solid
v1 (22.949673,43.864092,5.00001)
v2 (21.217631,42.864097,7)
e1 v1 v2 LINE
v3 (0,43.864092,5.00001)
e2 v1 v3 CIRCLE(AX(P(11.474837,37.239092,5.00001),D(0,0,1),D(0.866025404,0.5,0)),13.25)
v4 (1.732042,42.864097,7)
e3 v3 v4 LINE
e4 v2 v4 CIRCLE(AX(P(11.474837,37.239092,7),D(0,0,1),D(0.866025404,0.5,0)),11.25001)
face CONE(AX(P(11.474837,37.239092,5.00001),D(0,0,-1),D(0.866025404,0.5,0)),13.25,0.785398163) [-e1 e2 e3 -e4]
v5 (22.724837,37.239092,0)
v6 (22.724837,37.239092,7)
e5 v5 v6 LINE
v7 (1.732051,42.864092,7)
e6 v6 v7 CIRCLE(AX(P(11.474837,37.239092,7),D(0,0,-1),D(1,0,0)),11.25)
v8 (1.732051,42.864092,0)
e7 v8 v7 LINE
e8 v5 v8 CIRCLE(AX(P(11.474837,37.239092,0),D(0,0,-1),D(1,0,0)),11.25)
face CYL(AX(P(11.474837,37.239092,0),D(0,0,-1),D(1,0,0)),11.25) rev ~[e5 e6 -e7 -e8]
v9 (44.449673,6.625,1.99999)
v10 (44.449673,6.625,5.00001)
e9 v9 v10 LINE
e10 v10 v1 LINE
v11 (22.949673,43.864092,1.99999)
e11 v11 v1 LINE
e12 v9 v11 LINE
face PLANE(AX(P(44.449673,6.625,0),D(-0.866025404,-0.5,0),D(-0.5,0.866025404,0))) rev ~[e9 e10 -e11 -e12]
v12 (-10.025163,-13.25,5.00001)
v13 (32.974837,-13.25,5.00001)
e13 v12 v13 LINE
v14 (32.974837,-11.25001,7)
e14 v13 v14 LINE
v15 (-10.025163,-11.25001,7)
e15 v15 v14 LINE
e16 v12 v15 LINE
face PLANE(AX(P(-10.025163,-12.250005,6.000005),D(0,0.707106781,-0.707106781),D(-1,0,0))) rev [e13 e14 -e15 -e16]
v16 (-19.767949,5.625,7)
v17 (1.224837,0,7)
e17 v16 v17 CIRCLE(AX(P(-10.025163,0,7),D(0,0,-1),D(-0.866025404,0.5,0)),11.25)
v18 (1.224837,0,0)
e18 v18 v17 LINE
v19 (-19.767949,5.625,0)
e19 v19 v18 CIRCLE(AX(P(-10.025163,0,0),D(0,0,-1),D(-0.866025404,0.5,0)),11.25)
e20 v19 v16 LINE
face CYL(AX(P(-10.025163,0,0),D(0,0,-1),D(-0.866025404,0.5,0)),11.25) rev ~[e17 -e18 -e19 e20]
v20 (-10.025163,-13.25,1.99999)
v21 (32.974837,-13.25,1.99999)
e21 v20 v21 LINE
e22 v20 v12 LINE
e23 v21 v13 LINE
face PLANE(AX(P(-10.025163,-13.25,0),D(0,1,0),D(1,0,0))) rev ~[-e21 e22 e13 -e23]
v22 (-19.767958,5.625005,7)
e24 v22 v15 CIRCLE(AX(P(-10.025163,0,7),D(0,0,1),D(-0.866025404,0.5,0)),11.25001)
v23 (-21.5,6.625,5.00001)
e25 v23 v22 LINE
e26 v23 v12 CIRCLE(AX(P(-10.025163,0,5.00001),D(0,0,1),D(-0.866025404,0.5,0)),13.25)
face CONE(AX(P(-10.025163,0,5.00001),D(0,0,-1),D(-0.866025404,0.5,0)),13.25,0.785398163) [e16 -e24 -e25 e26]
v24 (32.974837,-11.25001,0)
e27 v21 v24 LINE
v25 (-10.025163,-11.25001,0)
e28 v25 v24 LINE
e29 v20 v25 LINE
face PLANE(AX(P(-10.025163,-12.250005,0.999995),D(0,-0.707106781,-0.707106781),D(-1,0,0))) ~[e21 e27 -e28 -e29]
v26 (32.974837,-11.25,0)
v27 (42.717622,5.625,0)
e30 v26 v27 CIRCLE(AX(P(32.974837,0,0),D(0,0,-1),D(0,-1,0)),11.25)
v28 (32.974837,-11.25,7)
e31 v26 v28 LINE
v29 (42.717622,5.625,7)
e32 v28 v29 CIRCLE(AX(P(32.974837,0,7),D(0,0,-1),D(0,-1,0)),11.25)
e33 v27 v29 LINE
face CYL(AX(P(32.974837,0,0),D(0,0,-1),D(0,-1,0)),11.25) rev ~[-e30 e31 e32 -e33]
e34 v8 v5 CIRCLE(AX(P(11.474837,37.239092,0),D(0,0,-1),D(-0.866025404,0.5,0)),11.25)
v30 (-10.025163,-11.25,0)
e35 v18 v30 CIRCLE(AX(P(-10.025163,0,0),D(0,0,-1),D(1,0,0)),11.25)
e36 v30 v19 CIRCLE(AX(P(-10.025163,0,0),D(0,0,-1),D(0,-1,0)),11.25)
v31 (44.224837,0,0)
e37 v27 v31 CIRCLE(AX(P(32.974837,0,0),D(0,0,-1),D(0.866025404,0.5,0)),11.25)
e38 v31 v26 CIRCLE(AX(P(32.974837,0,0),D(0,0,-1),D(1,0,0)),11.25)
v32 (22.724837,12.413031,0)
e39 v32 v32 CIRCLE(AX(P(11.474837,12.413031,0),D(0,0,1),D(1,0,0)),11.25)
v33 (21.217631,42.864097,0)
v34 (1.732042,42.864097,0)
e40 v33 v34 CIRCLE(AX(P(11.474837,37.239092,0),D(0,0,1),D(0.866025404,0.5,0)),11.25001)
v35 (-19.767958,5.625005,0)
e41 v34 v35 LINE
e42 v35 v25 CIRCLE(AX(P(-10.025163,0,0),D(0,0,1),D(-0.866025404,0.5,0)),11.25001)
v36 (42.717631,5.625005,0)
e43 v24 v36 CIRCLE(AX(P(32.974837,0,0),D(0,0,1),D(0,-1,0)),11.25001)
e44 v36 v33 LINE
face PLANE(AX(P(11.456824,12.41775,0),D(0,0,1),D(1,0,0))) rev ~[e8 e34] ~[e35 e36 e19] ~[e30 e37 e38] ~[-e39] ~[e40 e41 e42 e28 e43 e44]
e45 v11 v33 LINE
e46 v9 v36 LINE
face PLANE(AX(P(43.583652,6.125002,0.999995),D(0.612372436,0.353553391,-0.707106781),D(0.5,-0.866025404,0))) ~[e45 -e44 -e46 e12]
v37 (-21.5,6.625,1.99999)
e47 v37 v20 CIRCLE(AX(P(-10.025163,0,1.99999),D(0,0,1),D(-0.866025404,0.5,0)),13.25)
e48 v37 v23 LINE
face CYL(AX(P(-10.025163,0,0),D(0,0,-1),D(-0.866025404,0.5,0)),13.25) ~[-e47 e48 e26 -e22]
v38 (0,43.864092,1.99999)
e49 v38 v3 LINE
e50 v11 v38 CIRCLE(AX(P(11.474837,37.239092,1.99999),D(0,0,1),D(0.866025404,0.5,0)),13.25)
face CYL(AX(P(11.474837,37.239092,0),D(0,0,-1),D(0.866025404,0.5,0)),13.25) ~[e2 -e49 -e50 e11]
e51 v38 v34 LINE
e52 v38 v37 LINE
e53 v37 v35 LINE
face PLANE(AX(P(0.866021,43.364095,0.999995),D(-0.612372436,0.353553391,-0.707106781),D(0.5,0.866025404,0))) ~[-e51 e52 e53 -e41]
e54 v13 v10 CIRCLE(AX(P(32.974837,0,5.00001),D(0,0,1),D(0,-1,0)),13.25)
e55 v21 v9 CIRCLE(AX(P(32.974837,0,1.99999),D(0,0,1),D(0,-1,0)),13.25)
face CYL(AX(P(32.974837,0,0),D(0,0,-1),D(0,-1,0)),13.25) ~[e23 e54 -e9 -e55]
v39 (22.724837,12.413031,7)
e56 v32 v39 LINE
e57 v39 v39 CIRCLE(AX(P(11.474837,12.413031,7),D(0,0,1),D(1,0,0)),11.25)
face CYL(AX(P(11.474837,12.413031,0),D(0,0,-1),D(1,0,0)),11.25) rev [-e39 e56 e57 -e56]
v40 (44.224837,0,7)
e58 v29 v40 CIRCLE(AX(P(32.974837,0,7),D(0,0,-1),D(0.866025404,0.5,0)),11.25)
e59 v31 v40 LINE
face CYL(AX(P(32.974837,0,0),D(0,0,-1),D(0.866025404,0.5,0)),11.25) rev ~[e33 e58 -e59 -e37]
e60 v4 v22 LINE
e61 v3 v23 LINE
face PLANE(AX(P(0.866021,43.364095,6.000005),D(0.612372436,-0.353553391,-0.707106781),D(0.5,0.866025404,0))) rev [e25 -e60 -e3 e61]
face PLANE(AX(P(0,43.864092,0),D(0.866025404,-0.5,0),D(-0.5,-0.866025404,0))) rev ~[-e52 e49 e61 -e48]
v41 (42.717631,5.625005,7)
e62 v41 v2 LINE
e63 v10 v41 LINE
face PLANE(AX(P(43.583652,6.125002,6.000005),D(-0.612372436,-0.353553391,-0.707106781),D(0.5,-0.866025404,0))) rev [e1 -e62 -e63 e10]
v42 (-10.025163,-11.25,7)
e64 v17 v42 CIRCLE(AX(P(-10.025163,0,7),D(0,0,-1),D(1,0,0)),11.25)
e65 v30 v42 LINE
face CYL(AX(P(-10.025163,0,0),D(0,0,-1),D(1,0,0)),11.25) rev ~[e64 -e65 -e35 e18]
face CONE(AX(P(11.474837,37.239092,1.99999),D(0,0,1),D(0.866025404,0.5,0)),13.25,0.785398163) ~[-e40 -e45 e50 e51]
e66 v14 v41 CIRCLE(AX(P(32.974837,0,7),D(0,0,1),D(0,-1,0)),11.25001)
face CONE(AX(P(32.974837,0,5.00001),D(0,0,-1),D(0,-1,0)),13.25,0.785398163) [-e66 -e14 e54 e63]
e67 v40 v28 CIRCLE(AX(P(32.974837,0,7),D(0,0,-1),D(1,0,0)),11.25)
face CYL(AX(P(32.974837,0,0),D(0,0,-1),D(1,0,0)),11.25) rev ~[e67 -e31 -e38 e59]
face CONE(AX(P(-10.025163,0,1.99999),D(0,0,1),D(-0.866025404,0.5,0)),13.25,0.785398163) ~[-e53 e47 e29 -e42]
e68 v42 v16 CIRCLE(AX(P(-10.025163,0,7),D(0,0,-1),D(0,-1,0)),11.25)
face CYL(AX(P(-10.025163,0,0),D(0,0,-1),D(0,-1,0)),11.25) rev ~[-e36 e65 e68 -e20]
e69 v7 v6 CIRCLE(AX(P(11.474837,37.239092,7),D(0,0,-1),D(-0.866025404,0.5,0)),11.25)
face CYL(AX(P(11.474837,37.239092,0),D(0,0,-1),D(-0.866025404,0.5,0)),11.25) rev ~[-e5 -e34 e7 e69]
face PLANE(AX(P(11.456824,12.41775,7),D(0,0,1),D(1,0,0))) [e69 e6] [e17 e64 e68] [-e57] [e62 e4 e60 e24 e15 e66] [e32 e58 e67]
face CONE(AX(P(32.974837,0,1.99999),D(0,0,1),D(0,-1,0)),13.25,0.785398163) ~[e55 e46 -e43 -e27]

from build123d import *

# Parameters (mm, degrees)
F0_R     = 11.25
F1_DEPTH = 7
F2_SIZE  = 1.99999


# Not quite as in the source:
# - a fillet or chamfer is up to 0.001 mm smaller than in the source, because OpenCascade refuses the exact size
# - a feature names something its author has since deleted; it is built from what else it names


with BuildPart() as f1:
    # F0 (on Top) → F1 (new body)
    with BuildSketch(Plane.XY):
        with BuildLine():
            ThreePointArc((32.9748366001, -13.25), (44.4496732003, -6.625), (44.4496732003, 6.625))
            ThreePointArc((44.4496732003, 6.625), (35.3296022004, 13.0390789156), (24.5421176937, 10.2201639833))
            ThreePointArc((24.5421176937, 10.2201639833), (22.9496732003, 19.0380307876), (16.1093987873, 24.8260615752))
            ThreePointArc((16.1093987873, 24.8260615752), (23.9443929832, 32.7588397347), (22.9496732003, 43.8640923627))
            ThreePointArc((22.9496732003, 43.8640923627), (11.4748366001, 50.4890923627), (0, 43.8640923627))
            ThreePointArc((0, 43.8640923627), (-1.6185408213, 35.2078445445), (2.5465871703, 27.4488491524))
            ThreePointArc((2.5465871703, 27.4488491524), (4.5677953806, 25.931781383), (6.840274413, 24.8260615752))
            ThreePointArc((6.840274413, 24.8260615752), (0, 19.0380307876), (-1.5924444934, 10.2201639833))
            ThreePointArc((-1.5924444934, 10.2201639833), (-12.3799290001, 13.0390789156), (-21.5, 6.625))
            ThreePointArc((-21.5, 6.625), (-21.5, -6.625), (-10.0251633999, -13.25))
            ThreePointArc((-10.0251633999, -13.25), (0.0896273829, -8.5588262876), (3.0421176937, 2.1928668043))
            ThreePointArc((3.0421176937, 2.1928668043), (11.4748366001, -0.8369692124), (19.9075555066, 2.1928668043))
            ThreePointArc((19.9075555066, 2.1928668043), (22.8600458174, -8.5588262876), (32.9748366001, -13.25))
        make_face()
        with BuildLine():
            ThreePointArc((-19.7679491924, 5.625), (-7.1134491425, 10.8666655458), (1.2248366001, 0))
            ThreePointArc((1.2248366001, 0), (-2.0702121115, -7.9549512883), (-10.0251633999, -11.25))
            ThreePointArc((-10.0251633999, -11.25), (-19.7679491924, -5.625), (-19.7679491924, 5.625))
        make_face(mode=Mode.SUBTRACT)
        with BuildLine():
            ThreePointArc((44.2248366001, 0), (40.9297878885, -7.9549512883), (32.9748366001, -11.25))
            ThreePointArc((32.9748366001, -11.25), (23.2320508076, 5.625), (42.7176223927, 5.625))
            ThreePointArc((42.7176223927, 5.625), (43.8415021459, 2.9117142574), (44.2248366001, 0))
        make_face(mode=Mode.SUBTRACT)
        with Locations((11.4748366001, 12.4130307876)):
            Circle(F0_R, mode=Mode.SUBTRACT)
        with BuildLine():
            ThreePointArc((1.7320508076, 42.8640923627), (14.3865508575, 48.1057579085), (22.7248366001, 37.2390923627))
            ThreePointArc((22.7248366001, 37.2390923627), (8.5631223427, 26.372426817), (1.7320508076, 42.8640923627))
        make_face(mode=Mode.SUBTRACT)
        with BuildLine():
            ThreePointArc((2.5465871703, 27.4488491524), (-1.6185408213, 35.2078445445), (0, 43.8640923627))
            Line((0, 43.8640923627), (-21.5, 6.625))
            ThreePointArc((-21.5, 6.625), (-12.3799290001, 13.0390789156), (-1.5924444934, 10.2201639833))
            ThreePointArc((-1.5924444934, 10.2201639833), (0, 19.0380307876), (6.840274413, 24.8260615752))
            ThreePointArc((6.840274413, 24.8260615752), (4.5677953806, 25.931781383), (2.5465871703, 27.4488491524))
        make_face()
        with BuildLine():
            ThreePointArc((24.5421176937, 10.2201639833), (35.3296022004, 13.0390789156), (44.4496732003, 6.625))
            Line((44.4496732003, 6.625), (22.9496732003, 43.8640923627))
            ThreePointArc((22.9496732003, 43.8640923627), (23.9443929832, 32.7588397347), (16.1093987873, 24.8260615752))
            ThreePointArc((16.1093987873, 24.8260615752), (22.9496732003, 19.0380307876), (24.5421176937, 10.2201639833))
        make_face()
        with BuildLine():
            Line((-10.0251633999, -13.25), (32.9748366001, -13.25))
            ThreePointArc((32.9748366001, -13.25), (22.8600458174, -8.5588262876), (19.9075555066, 2.1928668043))
            ThreePointArc((19.9075555066, 2.1928668043), (11.4748366001, -0.8369692124), (3.0421176937, 2.1928668043))
            ThreePointArc((3.0421176937, 2.1928668043), (0.0896273829, -8.5588262876), (-10.0251633999, -13.25))
        make_face()
    extrude(amount=F1_DEPTH)

    # F2 (size 2 in the source; OpenCascade refuses exactly that, so slightly less here)
    f2_edges = [f1.edges().sort_by_distance(p)[0] for p in [
        (33.699673, 25.244546, 0),
        (44.449673, -6.625, 0),
        (11.474837, -13.25, 0),
        (-21.5, -6.625, 0),
        (-10.75, 25.244546, 0),
        (11.474837, 50.489092, 0),
        (-10.75, 25.244546, 7),
    ]]
    chamfer(f2_edges, length=F2_SIZE)


solid = f1.part
